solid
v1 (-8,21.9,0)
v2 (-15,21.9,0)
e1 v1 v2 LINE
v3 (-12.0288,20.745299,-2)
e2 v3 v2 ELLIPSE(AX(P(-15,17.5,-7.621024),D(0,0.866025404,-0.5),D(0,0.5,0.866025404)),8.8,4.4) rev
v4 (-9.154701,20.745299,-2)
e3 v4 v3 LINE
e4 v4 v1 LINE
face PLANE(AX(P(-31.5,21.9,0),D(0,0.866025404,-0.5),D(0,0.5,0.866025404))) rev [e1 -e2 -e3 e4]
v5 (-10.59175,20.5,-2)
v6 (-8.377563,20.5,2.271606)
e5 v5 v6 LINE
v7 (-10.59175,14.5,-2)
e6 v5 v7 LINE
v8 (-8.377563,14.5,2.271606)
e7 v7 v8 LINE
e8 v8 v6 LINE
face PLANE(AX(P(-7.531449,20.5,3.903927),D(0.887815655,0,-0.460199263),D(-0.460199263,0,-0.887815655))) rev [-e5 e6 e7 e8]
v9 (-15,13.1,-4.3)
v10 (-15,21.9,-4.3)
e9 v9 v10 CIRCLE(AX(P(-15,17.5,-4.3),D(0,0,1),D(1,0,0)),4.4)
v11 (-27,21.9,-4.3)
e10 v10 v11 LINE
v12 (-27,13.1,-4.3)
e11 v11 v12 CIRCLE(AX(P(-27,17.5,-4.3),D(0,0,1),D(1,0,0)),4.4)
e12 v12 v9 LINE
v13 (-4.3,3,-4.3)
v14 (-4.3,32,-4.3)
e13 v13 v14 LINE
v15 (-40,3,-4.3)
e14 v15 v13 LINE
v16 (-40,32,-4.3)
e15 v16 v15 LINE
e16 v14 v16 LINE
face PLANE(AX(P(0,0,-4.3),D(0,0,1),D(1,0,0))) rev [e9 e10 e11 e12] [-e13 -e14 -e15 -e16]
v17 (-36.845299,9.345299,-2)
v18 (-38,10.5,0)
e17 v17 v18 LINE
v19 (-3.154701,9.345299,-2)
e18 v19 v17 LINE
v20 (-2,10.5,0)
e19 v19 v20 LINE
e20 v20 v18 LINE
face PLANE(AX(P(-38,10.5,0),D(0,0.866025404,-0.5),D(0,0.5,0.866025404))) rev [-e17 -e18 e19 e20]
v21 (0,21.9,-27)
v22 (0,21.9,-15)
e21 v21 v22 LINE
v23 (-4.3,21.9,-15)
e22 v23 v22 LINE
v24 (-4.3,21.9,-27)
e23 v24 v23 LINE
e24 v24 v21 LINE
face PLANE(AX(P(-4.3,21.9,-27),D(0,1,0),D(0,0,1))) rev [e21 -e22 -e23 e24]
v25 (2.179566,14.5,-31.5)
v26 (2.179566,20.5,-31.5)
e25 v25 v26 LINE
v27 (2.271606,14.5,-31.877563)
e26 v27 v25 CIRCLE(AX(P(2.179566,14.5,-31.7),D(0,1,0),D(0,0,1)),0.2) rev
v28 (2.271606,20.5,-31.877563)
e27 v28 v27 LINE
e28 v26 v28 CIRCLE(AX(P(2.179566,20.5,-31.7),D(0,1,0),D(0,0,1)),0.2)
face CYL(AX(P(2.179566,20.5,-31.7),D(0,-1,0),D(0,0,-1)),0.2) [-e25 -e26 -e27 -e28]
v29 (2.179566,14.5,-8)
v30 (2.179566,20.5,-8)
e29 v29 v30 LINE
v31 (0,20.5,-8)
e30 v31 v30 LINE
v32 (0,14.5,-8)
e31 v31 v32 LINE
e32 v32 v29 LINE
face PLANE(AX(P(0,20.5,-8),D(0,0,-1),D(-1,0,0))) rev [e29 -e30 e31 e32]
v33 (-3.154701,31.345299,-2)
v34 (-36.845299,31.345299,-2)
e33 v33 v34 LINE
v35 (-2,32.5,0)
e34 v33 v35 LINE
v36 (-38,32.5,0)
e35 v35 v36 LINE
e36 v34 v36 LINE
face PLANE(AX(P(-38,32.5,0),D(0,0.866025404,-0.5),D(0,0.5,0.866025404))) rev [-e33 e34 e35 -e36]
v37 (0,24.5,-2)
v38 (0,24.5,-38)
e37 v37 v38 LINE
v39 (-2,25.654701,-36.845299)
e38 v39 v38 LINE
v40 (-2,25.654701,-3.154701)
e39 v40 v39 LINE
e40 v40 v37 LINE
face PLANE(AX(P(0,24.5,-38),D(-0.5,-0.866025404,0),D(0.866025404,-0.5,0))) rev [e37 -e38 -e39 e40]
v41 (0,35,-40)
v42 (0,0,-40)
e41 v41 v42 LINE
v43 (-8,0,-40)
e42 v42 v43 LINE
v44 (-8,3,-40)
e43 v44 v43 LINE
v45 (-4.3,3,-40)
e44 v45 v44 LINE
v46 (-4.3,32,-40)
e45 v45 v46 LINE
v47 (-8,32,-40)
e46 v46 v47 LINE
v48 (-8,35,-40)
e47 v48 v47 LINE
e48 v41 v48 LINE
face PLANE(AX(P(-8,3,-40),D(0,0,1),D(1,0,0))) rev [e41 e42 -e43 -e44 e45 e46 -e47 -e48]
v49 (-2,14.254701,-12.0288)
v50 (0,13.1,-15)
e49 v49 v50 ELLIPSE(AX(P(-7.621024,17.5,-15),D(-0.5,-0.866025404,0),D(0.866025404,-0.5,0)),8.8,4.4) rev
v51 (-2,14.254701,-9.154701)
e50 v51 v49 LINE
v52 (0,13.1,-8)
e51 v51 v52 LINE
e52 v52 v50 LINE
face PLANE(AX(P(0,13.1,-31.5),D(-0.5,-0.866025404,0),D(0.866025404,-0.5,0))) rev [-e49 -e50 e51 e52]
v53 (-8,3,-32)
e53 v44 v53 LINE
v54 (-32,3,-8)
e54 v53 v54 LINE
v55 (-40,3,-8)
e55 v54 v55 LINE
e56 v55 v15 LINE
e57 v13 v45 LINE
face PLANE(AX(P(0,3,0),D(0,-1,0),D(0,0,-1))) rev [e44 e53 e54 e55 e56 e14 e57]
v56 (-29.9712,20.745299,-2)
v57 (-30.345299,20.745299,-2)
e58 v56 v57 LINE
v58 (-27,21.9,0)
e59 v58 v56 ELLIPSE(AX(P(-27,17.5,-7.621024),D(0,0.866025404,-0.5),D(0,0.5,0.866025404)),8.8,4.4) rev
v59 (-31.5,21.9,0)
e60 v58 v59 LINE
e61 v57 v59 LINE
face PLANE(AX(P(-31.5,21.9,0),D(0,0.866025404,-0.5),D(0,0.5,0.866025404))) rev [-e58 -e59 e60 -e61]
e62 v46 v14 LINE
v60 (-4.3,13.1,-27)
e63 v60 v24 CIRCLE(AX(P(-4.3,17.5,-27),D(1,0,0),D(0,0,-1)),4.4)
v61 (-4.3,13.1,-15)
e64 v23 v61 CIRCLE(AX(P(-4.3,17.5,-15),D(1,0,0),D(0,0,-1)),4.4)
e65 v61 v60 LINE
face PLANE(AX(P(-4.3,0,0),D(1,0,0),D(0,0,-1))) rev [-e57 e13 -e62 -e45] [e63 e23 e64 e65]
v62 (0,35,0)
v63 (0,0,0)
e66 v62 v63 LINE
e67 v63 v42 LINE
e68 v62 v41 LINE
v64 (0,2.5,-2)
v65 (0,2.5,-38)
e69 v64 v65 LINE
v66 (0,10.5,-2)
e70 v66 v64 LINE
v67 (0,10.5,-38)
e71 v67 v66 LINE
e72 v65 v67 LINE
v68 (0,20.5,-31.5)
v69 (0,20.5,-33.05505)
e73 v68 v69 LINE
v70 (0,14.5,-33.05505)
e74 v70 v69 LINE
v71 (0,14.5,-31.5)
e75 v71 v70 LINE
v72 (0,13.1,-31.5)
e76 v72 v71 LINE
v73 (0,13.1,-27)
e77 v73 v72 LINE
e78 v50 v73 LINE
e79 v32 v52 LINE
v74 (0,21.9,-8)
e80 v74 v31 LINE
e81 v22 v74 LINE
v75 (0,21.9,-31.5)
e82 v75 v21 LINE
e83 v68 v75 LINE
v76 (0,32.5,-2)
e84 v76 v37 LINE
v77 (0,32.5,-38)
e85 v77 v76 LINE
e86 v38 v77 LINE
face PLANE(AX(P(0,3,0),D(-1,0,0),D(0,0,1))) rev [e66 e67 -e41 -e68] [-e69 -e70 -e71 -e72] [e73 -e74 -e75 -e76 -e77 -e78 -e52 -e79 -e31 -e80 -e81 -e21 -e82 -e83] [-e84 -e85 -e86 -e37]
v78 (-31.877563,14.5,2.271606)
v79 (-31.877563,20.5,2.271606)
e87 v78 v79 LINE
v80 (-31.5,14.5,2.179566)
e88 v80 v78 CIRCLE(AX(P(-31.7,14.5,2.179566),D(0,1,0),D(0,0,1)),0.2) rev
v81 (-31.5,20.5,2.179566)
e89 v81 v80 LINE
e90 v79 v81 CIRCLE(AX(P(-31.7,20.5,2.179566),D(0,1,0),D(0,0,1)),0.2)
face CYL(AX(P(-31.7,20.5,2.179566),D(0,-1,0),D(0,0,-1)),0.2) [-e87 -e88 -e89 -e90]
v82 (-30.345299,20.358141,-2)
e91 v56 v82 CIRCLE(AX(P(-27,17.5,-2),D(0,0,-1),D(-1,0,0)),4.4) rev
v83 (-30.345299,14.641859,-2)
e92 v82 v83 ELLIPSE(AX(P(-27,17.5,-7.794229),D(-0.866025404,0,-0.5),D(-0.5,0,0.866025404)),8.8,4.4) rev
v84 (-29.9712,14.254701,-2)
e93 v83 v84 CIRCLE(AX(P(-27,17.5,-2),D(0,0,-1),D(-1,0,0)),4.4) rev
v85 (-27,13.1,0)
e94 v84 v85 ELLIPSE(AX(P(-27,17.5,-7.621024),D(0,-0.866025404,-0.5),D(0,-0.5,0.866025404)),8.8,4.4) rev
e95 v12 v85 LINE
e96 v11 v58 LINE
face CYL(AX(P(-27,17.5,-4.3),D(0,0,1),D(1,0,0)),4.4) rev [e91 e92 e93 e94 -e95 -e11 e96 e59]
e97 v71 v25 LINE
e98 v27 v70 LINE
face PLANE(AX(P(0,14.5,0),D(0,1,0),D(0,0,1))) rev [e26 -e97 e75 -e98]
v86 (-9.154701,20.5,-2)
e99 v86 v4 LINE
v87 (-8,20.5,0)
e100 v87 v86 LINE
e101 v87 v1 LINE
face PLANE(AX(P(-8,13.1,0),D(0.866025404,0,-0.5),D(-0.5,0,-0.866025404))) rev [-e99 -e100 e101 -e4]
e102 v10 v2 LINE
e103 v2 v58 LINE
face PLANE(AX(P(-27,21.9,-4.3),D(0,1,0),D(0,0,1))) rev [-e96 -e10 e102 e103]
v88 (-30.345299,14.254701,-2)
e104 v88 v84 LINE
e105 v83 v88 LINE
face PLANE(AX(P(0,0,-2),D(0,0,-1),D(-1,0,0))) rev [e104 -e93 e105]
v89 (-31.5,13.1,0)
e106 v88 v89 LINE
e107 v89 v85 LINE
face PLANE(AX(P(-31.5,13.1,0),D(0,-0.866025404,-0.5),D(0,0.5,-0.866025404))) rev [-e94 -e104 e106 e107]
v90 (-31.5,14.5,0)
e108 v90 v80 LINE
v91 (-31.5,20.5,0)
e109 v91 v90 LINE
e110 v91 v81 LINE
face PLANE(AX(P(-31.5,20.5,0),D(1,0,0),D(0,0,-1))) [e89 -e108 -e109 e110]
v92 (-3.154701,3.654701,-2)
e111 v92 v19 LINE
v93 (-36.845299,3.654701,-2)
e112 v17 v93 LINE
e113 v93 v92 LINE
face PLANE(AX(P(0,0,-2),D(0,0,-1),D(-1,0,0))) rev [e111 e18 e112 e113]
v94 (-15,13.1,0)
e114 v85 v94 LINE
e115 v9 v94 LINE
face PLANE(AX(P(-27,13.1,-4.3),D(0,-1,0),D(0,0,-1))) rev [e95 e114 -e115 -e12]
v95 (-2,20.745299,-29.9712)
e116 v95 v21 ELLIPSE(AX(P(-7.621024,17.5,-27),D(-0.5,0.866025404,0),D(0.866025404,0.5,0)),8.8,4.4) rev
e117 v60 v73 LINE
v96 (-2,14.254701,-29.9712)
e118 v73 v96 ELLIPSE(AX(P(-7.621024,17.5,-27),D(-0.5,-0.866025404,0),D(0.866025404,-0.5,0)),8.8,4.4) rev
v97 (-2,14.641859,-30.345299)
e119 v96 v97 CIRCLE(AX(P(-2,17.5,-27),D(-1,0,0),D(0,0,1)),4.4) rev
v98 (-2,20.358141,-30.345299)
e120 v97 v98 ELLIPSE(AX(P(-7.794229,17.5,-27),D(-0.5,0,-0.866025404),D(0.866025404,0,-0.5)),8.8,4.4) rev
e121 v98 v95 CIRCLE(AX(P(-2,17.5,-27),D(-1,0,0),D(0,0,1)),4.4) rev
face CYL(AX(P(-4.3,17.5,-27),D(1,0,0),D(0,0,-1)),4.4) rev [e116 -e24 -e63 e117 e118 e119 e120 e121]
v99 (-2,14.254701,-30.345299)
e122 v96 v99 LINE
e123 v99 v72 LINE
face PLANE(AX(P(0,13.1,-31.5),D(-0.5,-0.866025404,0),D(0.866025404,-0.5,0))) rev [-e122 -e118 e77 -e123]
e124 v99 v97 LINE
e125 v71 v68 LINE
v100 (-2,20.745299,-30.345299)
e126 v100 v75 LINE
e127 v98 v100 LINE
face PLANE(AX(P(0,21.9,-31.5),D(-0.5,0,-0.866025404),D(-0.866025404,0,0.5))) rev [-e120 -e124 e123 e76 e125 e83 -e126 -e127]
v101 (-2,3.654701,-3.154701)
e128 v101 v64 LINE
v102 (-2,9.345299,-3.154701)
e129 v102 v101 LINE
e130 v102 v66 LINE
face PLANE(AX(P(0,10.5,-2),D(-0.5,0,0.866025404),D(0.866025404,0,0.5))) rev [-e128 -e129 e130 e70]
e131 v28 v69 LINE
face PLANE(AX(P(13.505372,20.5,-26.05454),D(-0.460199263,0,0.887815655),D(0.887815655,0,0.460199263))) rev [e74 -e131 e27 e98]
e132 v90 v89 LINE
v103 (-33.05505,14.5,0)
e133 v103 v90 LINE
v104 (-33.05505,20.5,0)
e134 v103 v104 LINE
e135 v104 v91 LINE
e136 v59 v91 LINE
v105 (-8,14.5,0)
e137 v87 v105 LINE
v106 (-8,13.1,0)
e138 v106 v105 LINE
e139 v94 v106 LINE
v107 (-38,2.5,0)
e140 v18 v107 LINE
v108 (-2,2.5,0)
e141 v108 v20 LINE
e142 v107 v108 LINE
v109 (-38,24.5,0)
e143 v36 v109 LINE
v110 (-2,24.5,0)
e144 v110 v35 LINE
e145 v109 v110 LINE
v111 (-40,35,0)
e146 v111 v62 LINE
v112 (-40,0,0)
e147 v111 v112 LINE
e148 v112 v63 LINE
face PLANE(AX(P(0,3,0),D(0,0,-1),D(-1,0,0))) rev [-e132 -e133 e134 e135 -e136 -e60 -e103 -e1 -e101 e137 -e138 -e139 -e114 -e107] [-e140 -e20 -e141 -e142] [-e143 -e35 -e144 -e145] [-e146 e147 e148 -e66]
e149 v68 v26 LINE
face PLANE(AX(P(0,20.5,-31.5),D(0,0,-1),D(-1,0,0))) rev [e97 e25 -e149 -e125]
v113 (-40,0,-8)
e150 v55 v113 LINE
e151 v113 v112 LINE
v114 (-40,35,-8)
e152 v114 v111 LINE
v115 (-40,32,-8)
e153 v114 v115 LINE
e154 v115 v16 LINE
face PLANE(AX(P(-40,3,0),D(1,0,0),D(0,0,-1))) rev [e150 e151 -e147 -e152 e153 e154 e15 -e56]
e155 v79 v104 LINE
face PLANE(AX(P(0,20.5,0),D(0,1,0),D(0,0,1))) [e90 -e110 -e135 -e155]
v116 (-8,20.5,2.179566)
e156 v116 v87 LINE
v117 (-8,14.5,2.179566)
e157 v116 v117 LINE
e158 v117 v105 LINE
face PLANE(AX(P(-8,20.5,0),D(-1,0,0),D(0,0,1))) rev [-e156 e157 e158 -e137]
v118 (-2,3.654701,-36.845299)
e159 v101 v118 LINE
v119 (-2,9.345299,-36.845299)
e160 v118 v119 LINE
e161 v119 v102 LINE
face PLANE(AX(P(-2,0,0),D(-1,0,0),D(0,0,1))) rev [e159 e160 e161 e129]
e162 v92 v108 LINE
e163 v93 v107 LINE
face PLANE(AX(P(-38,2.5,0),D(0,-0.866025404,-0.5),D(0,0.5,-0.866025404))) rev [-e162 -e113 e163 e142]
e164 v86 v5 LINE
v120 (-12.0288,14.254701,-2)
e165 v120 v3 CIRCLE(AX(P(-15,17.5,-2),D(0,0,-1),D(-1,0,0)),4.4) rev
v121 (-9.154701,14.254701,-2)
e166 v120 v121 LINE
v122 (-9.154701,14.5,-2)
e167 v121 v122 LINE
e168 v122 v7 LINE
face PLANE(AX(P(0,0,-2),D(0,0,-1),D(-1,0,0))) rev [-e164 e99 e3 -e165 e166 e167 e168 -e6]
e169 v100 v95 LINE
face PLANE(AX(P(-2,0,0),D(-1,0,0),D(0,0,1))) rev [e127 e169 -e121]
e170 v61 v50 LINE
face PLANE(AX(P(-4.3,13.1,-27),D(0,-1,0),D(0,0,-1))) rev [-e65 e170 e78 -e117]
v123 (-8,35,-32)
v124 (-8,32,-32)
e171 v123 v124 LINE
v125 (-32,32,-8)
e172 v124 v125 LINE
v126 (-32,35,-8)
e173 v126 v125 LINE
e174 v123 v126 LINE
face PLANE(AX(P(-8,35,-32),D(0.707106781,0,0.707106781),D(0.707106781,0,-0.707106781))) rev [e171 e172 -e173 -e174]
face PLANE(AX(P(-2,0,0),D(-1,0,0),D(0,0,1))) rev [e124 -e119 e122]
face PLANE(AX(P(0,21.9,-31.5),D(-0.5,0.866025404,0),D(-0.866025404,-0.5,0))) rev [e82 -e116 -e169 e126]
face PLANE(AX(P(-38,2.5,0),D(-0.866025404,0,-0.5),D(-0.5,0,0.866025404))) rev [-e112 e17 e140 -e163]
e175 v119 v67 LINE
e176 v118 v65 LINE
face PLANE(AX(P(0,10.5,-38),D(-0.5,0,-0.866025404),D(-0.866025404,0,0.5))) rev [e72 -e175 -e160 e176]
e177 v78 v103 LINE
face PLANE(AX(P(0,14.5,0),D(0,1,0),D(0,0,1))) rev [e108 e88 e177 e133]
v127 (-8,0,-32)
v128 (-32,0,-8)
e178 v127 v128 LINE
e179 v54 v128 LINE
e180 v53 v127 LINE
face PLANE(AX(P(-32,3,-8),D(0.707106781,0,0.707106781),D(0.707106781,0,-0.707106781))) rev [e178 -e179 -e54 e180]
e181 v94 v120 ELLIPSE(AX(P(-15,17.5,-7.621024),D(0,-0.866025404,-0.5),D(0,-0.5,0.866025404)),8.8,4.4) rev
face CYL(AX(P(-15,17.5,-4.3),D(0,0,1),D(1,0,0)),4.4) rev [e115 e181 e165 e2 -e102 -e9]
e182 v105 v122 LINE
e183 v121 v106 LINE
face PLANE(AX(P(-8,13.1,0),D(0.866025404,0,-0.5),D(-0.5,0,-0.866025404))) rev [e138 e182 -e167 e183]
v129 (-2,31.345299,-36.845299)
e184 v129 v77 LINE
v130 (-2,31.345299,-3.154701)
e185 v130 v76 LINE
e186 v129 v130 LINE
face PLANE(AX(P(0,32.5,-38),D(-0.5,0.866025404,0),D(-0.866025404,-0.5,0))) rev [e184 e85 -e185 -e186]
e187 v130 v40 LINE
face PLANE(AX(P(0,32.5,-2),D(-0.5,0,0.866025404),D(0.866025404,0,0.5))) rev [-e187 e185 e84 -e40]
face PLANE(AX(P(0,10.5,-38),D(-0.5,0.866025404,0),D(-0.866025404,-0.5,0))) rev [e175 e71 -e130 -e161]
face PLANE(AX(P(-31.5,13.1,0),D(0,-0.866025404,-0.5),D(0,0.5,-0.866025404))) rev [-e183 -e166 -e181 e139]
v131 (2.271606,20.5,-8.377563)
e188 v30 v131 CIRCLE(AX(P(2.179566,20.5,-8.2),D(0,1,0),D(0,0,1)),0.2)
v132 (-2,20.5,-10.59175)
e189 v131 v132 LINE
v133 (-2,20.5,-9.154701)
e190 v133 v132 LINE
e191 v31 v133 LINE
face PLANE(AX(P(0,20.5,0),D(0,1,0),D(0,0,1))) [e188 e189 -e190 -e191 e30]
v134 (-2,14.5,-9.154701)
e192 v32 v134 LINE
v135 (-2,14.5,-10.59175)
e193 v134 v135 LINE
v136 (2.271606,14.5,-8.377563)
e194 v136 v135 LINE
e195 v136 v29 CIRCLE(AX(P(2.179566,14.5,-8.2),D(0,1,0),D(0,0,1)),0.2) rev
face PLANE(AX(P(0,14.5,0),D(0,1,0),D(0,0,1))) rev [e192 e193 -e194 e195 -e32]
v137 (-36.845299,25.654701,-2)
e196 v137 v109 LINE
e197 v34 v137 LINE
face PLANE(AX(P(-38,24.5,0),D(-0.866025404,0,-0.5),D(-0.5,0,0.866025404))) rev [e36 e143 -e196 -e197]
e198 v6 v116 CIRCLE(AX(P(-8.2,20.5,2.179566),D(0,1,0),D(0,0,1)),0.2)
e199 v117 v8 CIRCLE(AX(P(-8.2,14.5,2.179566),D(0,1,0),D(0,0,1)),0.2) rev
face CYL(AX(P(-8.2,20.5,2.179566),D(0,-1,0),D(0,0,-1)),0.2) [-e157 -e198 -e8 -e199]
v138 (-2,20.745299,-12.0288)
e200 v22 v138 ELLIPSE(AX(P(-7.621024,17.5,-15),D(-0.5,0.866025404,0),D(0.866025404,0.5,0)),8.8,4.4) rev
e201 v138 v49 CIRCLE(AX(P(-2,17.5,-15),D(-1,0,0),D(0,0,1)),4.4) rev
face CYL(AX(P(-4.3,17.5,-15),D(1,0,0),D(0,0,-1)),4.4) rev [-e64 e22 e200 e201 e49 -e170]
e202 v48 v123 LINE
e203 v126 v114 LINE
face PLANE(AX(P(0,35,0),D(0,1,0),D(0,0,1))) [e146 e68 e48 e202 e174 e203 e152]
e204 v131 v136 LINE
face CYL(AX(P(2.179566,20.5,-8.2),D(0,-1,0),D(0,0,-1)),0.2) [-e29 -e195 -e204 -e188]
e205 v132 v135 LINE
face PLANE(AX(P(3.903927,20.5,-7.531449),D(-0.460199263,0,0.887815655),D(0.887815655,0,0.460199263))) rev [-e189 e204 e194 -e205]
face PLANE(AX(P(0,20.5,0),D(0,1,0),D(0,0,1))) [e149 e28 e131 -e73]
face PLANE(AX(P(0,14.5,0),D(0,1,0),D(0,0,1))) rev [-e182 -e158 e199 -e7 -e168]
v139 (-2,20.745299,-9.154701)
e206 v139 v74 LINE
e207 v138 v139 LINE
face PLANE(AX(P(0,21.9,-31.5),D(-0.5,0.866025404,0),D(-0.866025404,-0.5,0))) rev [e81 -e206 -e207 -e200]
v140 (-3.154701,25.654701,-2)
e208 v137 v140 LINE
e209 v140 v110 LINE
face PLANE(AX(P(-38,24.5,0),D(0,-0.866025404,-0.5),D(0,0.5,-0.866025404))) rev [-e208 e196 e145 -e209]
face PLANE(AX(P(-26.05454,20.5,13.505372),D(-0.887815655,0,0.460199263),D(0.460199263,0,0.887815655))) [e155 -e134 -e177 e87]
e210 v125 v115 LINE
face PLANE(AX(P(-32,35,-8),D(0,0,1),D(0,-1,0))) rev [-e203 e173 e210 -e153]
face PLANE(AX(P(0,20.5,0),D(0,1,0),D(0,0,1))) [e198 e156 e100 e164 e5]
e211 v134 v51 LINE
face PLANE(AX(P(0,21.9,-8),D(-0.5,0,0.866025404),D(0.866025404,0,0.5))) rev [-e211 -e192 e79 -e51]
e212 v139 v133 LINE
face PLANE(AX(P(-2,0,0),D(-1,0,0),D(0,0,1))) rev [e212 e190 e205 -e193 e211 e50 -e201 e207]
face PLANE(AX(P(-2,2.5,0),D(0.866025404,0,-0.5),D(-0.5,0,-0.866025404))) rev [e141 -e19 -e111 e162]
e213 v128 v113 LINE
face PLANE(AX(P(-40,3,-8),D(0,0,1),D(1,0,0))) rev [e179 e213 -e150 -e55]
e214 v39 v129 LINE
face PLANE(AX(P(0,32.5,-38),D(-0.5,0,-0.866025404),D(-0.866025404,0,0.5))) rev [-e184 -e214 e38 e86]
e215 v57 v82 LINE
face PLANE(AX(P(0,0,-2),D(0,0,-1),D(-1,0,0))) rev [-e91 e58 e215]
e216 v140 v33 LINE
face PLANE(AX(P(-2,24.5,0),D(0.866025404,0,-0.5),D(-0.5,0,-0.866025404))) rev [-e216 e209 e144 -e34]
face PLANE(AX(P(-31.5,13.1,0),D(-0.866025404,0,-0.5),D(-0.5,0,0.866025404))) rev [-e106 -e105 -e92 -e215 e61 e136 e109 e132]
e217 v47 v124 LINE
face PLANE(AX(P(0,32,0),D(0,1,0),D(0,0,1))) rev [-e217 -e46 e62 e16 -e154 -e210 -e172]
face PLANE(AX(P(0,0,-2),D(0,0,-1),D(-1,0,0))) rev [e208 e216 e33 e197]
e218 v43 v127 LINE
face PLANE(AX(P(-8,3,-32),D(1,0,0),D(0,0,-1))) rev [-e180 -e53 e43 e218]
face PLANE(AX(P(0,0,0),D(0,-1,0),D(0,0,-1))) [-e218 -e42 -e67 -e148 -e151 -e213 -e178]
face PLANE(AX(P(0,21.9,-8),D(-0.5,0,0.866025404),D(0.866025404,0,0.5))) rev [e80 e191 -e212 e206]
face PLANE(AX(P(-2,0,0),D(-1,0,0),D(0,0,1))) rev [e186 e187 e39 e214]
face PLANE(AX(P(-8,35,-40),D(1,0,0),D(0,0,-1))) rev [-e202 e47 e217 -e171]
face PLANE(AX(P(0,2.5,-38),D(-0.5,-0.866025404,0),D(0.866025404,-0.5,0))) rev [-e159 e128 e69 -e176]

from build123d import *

# Parameters (mm, degrees)
EXTRUDE_1_DEPTH               = 3
SKETCH_2_W                    = 40
SKETCH_2_H                    = 29
EXTRUDE_2_DEPTH               = 4.3
EXTRUDE_3_DEPTH               = 3
SKETCH_4_W                    = 35.7
SKETCH_4_H                    = 29
EXTRUDE_4_DEPTH               = 4.3
SKETCH_5_W                    = 36
SKETCH_5_H                    = 8
CUT_EXTRUDE_1_DEPTH           = 2
CUT_EXTRUDE_1_DRAFT           = -30
CUT_EXTRUDE_1_PROFILE_2_DEPTH = 2
CUT_EXTRUDE_1_PROFILE_2_DRAFT = -30
SKETCH_5_W_2                  = 23.5
SKETCH_5_H_2                  = 8.8
CUT_EXTRUDE_1_PROFILE_3_DEPTH = 2
CUT_EXTRUDE_1_PROFILE_3_DRAFT = -30
SKETCH_6_W                    = 36
SKETCH_6_H                    = 8
CUT_EXTRUDE_2_DEPTH           = 2
CUT_EXTRUDE_2_DRAFT           = -30
CUT_EXTRUDE_2_PROFILE_2_DEPTH = 2
CUT_EXTRUDE_2_PROFILE_2_DRAFT = -30
SKETCH_6_W_2                  = 23.5
SKETCH_6_H_2                  = 8.8
CUT_EXTRUDE_2_PROFILE_3_DEPTH = 2
CUT_EXTRUDE_2_PROFILE_3_DRAFT = -30
EXTRUDE_5_DEPTH               = 3
EXTRUDE_6_DEPTH               = 3
FILLET_2_R                    = 0.2


with BuildPart() as part:
    # 草图1 → 凸台-拉伸1 (new body)
    with BuildSketch(Plane(origin=(0, 0, 0), x_dir=(1, 0, 0), z_dir=(0, 1, 0))):
        Polygon((0, 0), (0, 40), (-8, 40), (-8, 32), (-32, 8), (-40, 8), (-40, 0), align=None)
    extrude(amount=EXTRUDE_1_DEPTH)

    # 草图2 → 凸台-拉伸2 (add)
    with BuildSketch(Plane(origin=(0, 0, 0), x_dir=(0, 0, -1), z_dir=(1, 0, 0))):
        with Locations((20, 17.5)):
            Rectangle(SKETCH_2_W, SKETCH_2_H)
        with BuildLine():
            Line((27, 13.1), (15, 13.1))
            ThreePointArc((15, 13.1), (10.6, 17.5), (15, 21.9))
            Line((15, 21.9), (27, 21.9))
            ThreePointArc((27, 21.9), (31.4, 17.5), (27, 13.1))
        make_face(mode=Mode.SUBTRACT)
    extrude(amount=-EXTRUDE_2_DEPTH)

    # 草图3 → 凸台-拉伸3 (add)
    with BuildSketch(Plane(origin=(0, 32, 0), x_dir=(1, 0, 0), z_dir=(0, 1, 0))):
        Polygon((-4.3, 40), (0, 40), (0, 0), (-4.3, 0), (-40, 0), (-40, 8), (-32, 8), (-8, 32), (-8, 40), align=None)
    extrude(amount=EXTRUDE_3_DEPTH)

    # 草图4 → 凸台-拉伸4 (add)
    with BuildSketch(Plane.XY):
        with Locations((-22.15, 17.5)):
            Rectangle(SKETCH_4_W, SKETCH_4_H)
        with BuildLine():
            Line((-27, 21.9), (-15, 21.9))
            ThreePointArc((-15, 21.9), (-10.6, 17.5), (-15, 13.1))
            Line((-15, 13.1), (-27, 13.1))
            ThreePointArc((-27, 13.1), (-31.4, 17.5), (-27, 21.9))
        make_face(mode=Mode.SUBTRACT)
    extrude(amount=-EXTRUDE_4_DEPTH)


with BuildPart() as cut_extrude_1_tool:
    # 草图5 → 切除-拉伸1 (with draft: the straight prism first)
    with BuildSketch(Plane(origin=(0, 0, 0), x_dir=(0, 0, -1), z_dir=(1, 0, 0))):
        with Locations((20, 28.5)):
            Rectangle(SKETCH_5_W, SKETCH_5_H)
    extrude(amount=-CUT_EXTRUDE_1_DEPTH)
    # 切除-拉伸1: the draft: its side faces are tilted about the plane it starts from
    cut_extrude_1_sides = [cut_extrude_1_tool.faces().sort_by_distance(p)[0] for p in [
        (-1, 32.5, -20),
        (-1, 28.5, -2),
        (-1, 24.5, -20),
        (-1, 28.5, -38),
    ]]
    draft(cut_extrude_1_sides, Plane(origin=(0, 0, 0), x_dir=(0, 0, -1), z_dir=(1, 0, 0)), CUT_EXTRUDE_1_DRAFT)


with BuildPart() as part_1:
    add(part.part)

    # 切除-拉伸1: cut by cut_extrude_1_tool
    add(cut_extrude_1_tool.part, mode=Mode.SUBTRACT)


with BuildPart() as cut_extrude_1_profile_2_tool:
    # 草图5 → 切除-拉伸1 profile 2 (with draft: the straight prism first)
    with BuildSketch(Plane(origin=(0, 0, 0), x_dir=(0, 0, -1), z_dir=(1, 0, 0))):
        with Locations((20, 6.5)):
            Rectangle(SKETCH_5_W, SKETCH_5_H)
    extrude(amount=-CUT_EXTRUDE_1_PROFILE_2_DEPTH)
    # 切除-拉伸1 profile 2: the draft: its side faces are tilted about the plane it starts from
    cut_extrude_1_profile_2_sides = [cut_extrude_1_profile_2_tool.faces().sort_by_distance(p)[0] for p in [
        (-1, 10.5, -20),
        (-1, 6.5, -2),
        (-1, 2.5, -20),
        (-1, 6.5, -38),
    ]]
    draft(cut_extrude_1_profile_2_sides, Plane(origin=(0, 0, 0), x_dir=(0, 0, -1), z_dir=(1, 0, 0)), CUT_EXTRUDE_1_PROFILE_2_DRAFT)


with BuildPart() as part_2:
    add(part_1.part)

    # 切除-拉伸1 profile 2: cut by cut_extrude_1_profile_2_tool
    add(cut_extrude_1_profile_2_tool.part, mode=Mode.SUBTRACT)


with BuildPart() as cut_extrude_1_profile_3_tool:
    # 草图5 → 切除-拉伸1 profile 3 (with draft: the straight prism first)
    with BuildSketch(Plane(origin=(0, 0, 0), x_dir=(0, 0, -1), z_dir=(1, 0, 0))):
        with Locations((19.75, 17.5)):
            Rectangle(SKETCH_5_W_2, SKETCH_5_H_2)
    extrude(amount=-CUT_EXTRUDE_1_PROFILE_3_DEPTH)
    # 切除-拉伸1 profile 3: the draft: its side faces are tilted about the plane it starts from
    cut_extrude_1_profile_3_sides = [cut_extrude_1_profile_3_tool.faces().sort_by_distance(p)[0] for p in [
        (-1, 21.9, -19.75),
        (-1, 17.5, -8),
        (-1, 13.1, -19.75),
        (-1, 17.5, -31.5),
    ]]
    draft(cut_extrude_1_profile_3_sides, Plane(origin=(0, 0, 0), x_dir=(0, 0, -1), z_dir=(1, 0, 0)), CUT_EXTRUDE_1_PROFILE_3_DRAFT)


with BuildPart() as part_3:
    add(part_2.part)

    # 切除-拉伸1 profile 3: cut by cut_extrude_1_profile_3_tool
    add(cut_extrude_1_profile_3_tool.part, mode=Mode.SUBTRACT)


with BuildPart() as cut_extrude_2_tool:
    # 草图6 → 切除-拉伸2 (with draft: the straight prism first)
    with BuildSketch(Plane.XY):
        with Locations((-20, 6.5)):
            Rectangle(SKETCH_6_W, SKETCH_6_H)
    extrude(amount=-CUT_EXTRUDE_2_DEPTH)
    # 切除-拉伸2: the draft: its side faces are tilted about the plane it starts from
    cut_extrude_2_sides = [cut_extrude_2_tool.faces().sort_by_distance(p)[0] for p in [
        (-20, 2.5, -1),
        (-2, 6.5, -1),
        (-20, 10.5, -1),
        (-38, 6.5, -1),
    ]]
    draft(cut_extrude_2_sides, Plane.XY, CUT_EXTRUDE_2_DRAFT)


with BuildPart() as part_4:
    add(part_3.part)

    # 切除-拉伸2: cut by cut_extrude_2_tool
    add(cut_extrude_2_tool.part, mode=Mode.SUBTRACT)


with BuildPart() as cut_extrude_2_profile_2_tool:
    # 草图6 → 切除-拉伸2 profile 2 (with draft: the straight prism first)
    with BuildSketch(Plane.XY):
        with Locations((-20, 28.5)):
            Rectangle(SKETCH_6_W, SKETCH_6_H)
    extrude(amount=-CUT_EXTRUDE_2_PROFILE_2_DEPTH)
    # 切除-拉伸2 profile 2: the draft: its side faces are tilted about the plane it starts from
    cut_extrude_2_profile_2_sides = [cut_extrude_2_profile_2_tool.faces().sort_by_distance(p)[0] for p in [
        (-20, 24.5, -1),
        (-2, 28.5, -1),
        (-20, 32.5, -1),
        (-38, 28.5, -1),
    ]]
    draft(cut_extrude_2_profile_2_sides, Plane.XY, CUT_EXTRUDE_2_PROFILE_2_DRAFT)


with BuildPart() as part_5:
    add(part_4.part)

    # 切除-拉伸2 profile 2: cut by cut_extrude_2_profile_2_tool
    add(cut_extrude_2_profile_2_tool.part, mode=Mode.SUBTRACT)


with BuildPart() as cut_extrude_2_profile_3_tool:
    # 草图6 → 切除-拉伸2 profile 3 (with draft: the straight prism first)
    with BuildSketch(Plane.XY):
        with Locations((-19.75, 17.5)):
            Rectangle(SKETCH_6_W_2, SKETCH_6_H_2)
    extrude(amount=-CUT_EXTRUDE_2_PROFILE_3_DEPTH)
    # 切除-拉伸2 profile 3: the draft: its side faces are tilted about the plane it starts from
    cut_extrude_2_profile_3_sides = [cut_extrude_2_profile_3_tool.faces().sort_by_distance(p)[0] for p in [
        (-19.75, 13.1, -1),
        (-8, 17.5, -1),
        (-19.75, 21.9, -1),
        (-31.5, 17.5, -1),
    ]]
    draft(cut_extrude_2_profile_3_sides, Plane.XY, CUT_EXTRUDE_2_PROFILE_3_DRAFT)


with BuildPart() as part_6:
    add(part_5.part)

    # 切除-拉伸2 profile 3: cut by cut_extrude_2_profile_3_tool
    add(cut_extrude_2_profile_3_tool.part, mode=Mode.SUBTRACT)

    # 草图7 → 凸台-拉伸5 (add, symmetric)
    with BuildSketch(Plane(origin=(0, 17.5, 0), x_dir=(1, 0, 0), z_dir=(0, 1, 0))):
        Polygon((-2, 8), (3, 8), (-2, 10.591750104), align=None)
        Polygon((-2, 34.091750104), (-2, 31.5), (3, 31.5), align=None)
    extrude(amount=EXTRUDE_5_DEPTH, both=True)

    # 草图8 → 凸台-拉伸6 (add, symmetric)
    with BuildSketch(Plane(origin=(0, 17.5, 0), x_dir=(1, 0, 0), z_dir=(0, 1, 0))):
        Polygon((-8, -3), (-8, 0), (-9.154700538, 2), (-10.591750104, 2), align=None)
        Polygon((-31.5, -3), (-31.5, 2), (-34.091750104, 2), align=None)
    extrude(amount=EXTRUDE_6_DEPTH, both=True)

    # 圆角2
    fillet_2_edges = [part_6.edges().sort_by_distance(p)[0] for p in [
        (3, 17.5, -31.5),
        (3, 17.5, -8),
        (-31.5, 17.5, 3),
        (-8, 17.5, 3),
    ]]
    fillet(fillet_2_edges, radius=FILLET_2_R)


solid = part_6.part
